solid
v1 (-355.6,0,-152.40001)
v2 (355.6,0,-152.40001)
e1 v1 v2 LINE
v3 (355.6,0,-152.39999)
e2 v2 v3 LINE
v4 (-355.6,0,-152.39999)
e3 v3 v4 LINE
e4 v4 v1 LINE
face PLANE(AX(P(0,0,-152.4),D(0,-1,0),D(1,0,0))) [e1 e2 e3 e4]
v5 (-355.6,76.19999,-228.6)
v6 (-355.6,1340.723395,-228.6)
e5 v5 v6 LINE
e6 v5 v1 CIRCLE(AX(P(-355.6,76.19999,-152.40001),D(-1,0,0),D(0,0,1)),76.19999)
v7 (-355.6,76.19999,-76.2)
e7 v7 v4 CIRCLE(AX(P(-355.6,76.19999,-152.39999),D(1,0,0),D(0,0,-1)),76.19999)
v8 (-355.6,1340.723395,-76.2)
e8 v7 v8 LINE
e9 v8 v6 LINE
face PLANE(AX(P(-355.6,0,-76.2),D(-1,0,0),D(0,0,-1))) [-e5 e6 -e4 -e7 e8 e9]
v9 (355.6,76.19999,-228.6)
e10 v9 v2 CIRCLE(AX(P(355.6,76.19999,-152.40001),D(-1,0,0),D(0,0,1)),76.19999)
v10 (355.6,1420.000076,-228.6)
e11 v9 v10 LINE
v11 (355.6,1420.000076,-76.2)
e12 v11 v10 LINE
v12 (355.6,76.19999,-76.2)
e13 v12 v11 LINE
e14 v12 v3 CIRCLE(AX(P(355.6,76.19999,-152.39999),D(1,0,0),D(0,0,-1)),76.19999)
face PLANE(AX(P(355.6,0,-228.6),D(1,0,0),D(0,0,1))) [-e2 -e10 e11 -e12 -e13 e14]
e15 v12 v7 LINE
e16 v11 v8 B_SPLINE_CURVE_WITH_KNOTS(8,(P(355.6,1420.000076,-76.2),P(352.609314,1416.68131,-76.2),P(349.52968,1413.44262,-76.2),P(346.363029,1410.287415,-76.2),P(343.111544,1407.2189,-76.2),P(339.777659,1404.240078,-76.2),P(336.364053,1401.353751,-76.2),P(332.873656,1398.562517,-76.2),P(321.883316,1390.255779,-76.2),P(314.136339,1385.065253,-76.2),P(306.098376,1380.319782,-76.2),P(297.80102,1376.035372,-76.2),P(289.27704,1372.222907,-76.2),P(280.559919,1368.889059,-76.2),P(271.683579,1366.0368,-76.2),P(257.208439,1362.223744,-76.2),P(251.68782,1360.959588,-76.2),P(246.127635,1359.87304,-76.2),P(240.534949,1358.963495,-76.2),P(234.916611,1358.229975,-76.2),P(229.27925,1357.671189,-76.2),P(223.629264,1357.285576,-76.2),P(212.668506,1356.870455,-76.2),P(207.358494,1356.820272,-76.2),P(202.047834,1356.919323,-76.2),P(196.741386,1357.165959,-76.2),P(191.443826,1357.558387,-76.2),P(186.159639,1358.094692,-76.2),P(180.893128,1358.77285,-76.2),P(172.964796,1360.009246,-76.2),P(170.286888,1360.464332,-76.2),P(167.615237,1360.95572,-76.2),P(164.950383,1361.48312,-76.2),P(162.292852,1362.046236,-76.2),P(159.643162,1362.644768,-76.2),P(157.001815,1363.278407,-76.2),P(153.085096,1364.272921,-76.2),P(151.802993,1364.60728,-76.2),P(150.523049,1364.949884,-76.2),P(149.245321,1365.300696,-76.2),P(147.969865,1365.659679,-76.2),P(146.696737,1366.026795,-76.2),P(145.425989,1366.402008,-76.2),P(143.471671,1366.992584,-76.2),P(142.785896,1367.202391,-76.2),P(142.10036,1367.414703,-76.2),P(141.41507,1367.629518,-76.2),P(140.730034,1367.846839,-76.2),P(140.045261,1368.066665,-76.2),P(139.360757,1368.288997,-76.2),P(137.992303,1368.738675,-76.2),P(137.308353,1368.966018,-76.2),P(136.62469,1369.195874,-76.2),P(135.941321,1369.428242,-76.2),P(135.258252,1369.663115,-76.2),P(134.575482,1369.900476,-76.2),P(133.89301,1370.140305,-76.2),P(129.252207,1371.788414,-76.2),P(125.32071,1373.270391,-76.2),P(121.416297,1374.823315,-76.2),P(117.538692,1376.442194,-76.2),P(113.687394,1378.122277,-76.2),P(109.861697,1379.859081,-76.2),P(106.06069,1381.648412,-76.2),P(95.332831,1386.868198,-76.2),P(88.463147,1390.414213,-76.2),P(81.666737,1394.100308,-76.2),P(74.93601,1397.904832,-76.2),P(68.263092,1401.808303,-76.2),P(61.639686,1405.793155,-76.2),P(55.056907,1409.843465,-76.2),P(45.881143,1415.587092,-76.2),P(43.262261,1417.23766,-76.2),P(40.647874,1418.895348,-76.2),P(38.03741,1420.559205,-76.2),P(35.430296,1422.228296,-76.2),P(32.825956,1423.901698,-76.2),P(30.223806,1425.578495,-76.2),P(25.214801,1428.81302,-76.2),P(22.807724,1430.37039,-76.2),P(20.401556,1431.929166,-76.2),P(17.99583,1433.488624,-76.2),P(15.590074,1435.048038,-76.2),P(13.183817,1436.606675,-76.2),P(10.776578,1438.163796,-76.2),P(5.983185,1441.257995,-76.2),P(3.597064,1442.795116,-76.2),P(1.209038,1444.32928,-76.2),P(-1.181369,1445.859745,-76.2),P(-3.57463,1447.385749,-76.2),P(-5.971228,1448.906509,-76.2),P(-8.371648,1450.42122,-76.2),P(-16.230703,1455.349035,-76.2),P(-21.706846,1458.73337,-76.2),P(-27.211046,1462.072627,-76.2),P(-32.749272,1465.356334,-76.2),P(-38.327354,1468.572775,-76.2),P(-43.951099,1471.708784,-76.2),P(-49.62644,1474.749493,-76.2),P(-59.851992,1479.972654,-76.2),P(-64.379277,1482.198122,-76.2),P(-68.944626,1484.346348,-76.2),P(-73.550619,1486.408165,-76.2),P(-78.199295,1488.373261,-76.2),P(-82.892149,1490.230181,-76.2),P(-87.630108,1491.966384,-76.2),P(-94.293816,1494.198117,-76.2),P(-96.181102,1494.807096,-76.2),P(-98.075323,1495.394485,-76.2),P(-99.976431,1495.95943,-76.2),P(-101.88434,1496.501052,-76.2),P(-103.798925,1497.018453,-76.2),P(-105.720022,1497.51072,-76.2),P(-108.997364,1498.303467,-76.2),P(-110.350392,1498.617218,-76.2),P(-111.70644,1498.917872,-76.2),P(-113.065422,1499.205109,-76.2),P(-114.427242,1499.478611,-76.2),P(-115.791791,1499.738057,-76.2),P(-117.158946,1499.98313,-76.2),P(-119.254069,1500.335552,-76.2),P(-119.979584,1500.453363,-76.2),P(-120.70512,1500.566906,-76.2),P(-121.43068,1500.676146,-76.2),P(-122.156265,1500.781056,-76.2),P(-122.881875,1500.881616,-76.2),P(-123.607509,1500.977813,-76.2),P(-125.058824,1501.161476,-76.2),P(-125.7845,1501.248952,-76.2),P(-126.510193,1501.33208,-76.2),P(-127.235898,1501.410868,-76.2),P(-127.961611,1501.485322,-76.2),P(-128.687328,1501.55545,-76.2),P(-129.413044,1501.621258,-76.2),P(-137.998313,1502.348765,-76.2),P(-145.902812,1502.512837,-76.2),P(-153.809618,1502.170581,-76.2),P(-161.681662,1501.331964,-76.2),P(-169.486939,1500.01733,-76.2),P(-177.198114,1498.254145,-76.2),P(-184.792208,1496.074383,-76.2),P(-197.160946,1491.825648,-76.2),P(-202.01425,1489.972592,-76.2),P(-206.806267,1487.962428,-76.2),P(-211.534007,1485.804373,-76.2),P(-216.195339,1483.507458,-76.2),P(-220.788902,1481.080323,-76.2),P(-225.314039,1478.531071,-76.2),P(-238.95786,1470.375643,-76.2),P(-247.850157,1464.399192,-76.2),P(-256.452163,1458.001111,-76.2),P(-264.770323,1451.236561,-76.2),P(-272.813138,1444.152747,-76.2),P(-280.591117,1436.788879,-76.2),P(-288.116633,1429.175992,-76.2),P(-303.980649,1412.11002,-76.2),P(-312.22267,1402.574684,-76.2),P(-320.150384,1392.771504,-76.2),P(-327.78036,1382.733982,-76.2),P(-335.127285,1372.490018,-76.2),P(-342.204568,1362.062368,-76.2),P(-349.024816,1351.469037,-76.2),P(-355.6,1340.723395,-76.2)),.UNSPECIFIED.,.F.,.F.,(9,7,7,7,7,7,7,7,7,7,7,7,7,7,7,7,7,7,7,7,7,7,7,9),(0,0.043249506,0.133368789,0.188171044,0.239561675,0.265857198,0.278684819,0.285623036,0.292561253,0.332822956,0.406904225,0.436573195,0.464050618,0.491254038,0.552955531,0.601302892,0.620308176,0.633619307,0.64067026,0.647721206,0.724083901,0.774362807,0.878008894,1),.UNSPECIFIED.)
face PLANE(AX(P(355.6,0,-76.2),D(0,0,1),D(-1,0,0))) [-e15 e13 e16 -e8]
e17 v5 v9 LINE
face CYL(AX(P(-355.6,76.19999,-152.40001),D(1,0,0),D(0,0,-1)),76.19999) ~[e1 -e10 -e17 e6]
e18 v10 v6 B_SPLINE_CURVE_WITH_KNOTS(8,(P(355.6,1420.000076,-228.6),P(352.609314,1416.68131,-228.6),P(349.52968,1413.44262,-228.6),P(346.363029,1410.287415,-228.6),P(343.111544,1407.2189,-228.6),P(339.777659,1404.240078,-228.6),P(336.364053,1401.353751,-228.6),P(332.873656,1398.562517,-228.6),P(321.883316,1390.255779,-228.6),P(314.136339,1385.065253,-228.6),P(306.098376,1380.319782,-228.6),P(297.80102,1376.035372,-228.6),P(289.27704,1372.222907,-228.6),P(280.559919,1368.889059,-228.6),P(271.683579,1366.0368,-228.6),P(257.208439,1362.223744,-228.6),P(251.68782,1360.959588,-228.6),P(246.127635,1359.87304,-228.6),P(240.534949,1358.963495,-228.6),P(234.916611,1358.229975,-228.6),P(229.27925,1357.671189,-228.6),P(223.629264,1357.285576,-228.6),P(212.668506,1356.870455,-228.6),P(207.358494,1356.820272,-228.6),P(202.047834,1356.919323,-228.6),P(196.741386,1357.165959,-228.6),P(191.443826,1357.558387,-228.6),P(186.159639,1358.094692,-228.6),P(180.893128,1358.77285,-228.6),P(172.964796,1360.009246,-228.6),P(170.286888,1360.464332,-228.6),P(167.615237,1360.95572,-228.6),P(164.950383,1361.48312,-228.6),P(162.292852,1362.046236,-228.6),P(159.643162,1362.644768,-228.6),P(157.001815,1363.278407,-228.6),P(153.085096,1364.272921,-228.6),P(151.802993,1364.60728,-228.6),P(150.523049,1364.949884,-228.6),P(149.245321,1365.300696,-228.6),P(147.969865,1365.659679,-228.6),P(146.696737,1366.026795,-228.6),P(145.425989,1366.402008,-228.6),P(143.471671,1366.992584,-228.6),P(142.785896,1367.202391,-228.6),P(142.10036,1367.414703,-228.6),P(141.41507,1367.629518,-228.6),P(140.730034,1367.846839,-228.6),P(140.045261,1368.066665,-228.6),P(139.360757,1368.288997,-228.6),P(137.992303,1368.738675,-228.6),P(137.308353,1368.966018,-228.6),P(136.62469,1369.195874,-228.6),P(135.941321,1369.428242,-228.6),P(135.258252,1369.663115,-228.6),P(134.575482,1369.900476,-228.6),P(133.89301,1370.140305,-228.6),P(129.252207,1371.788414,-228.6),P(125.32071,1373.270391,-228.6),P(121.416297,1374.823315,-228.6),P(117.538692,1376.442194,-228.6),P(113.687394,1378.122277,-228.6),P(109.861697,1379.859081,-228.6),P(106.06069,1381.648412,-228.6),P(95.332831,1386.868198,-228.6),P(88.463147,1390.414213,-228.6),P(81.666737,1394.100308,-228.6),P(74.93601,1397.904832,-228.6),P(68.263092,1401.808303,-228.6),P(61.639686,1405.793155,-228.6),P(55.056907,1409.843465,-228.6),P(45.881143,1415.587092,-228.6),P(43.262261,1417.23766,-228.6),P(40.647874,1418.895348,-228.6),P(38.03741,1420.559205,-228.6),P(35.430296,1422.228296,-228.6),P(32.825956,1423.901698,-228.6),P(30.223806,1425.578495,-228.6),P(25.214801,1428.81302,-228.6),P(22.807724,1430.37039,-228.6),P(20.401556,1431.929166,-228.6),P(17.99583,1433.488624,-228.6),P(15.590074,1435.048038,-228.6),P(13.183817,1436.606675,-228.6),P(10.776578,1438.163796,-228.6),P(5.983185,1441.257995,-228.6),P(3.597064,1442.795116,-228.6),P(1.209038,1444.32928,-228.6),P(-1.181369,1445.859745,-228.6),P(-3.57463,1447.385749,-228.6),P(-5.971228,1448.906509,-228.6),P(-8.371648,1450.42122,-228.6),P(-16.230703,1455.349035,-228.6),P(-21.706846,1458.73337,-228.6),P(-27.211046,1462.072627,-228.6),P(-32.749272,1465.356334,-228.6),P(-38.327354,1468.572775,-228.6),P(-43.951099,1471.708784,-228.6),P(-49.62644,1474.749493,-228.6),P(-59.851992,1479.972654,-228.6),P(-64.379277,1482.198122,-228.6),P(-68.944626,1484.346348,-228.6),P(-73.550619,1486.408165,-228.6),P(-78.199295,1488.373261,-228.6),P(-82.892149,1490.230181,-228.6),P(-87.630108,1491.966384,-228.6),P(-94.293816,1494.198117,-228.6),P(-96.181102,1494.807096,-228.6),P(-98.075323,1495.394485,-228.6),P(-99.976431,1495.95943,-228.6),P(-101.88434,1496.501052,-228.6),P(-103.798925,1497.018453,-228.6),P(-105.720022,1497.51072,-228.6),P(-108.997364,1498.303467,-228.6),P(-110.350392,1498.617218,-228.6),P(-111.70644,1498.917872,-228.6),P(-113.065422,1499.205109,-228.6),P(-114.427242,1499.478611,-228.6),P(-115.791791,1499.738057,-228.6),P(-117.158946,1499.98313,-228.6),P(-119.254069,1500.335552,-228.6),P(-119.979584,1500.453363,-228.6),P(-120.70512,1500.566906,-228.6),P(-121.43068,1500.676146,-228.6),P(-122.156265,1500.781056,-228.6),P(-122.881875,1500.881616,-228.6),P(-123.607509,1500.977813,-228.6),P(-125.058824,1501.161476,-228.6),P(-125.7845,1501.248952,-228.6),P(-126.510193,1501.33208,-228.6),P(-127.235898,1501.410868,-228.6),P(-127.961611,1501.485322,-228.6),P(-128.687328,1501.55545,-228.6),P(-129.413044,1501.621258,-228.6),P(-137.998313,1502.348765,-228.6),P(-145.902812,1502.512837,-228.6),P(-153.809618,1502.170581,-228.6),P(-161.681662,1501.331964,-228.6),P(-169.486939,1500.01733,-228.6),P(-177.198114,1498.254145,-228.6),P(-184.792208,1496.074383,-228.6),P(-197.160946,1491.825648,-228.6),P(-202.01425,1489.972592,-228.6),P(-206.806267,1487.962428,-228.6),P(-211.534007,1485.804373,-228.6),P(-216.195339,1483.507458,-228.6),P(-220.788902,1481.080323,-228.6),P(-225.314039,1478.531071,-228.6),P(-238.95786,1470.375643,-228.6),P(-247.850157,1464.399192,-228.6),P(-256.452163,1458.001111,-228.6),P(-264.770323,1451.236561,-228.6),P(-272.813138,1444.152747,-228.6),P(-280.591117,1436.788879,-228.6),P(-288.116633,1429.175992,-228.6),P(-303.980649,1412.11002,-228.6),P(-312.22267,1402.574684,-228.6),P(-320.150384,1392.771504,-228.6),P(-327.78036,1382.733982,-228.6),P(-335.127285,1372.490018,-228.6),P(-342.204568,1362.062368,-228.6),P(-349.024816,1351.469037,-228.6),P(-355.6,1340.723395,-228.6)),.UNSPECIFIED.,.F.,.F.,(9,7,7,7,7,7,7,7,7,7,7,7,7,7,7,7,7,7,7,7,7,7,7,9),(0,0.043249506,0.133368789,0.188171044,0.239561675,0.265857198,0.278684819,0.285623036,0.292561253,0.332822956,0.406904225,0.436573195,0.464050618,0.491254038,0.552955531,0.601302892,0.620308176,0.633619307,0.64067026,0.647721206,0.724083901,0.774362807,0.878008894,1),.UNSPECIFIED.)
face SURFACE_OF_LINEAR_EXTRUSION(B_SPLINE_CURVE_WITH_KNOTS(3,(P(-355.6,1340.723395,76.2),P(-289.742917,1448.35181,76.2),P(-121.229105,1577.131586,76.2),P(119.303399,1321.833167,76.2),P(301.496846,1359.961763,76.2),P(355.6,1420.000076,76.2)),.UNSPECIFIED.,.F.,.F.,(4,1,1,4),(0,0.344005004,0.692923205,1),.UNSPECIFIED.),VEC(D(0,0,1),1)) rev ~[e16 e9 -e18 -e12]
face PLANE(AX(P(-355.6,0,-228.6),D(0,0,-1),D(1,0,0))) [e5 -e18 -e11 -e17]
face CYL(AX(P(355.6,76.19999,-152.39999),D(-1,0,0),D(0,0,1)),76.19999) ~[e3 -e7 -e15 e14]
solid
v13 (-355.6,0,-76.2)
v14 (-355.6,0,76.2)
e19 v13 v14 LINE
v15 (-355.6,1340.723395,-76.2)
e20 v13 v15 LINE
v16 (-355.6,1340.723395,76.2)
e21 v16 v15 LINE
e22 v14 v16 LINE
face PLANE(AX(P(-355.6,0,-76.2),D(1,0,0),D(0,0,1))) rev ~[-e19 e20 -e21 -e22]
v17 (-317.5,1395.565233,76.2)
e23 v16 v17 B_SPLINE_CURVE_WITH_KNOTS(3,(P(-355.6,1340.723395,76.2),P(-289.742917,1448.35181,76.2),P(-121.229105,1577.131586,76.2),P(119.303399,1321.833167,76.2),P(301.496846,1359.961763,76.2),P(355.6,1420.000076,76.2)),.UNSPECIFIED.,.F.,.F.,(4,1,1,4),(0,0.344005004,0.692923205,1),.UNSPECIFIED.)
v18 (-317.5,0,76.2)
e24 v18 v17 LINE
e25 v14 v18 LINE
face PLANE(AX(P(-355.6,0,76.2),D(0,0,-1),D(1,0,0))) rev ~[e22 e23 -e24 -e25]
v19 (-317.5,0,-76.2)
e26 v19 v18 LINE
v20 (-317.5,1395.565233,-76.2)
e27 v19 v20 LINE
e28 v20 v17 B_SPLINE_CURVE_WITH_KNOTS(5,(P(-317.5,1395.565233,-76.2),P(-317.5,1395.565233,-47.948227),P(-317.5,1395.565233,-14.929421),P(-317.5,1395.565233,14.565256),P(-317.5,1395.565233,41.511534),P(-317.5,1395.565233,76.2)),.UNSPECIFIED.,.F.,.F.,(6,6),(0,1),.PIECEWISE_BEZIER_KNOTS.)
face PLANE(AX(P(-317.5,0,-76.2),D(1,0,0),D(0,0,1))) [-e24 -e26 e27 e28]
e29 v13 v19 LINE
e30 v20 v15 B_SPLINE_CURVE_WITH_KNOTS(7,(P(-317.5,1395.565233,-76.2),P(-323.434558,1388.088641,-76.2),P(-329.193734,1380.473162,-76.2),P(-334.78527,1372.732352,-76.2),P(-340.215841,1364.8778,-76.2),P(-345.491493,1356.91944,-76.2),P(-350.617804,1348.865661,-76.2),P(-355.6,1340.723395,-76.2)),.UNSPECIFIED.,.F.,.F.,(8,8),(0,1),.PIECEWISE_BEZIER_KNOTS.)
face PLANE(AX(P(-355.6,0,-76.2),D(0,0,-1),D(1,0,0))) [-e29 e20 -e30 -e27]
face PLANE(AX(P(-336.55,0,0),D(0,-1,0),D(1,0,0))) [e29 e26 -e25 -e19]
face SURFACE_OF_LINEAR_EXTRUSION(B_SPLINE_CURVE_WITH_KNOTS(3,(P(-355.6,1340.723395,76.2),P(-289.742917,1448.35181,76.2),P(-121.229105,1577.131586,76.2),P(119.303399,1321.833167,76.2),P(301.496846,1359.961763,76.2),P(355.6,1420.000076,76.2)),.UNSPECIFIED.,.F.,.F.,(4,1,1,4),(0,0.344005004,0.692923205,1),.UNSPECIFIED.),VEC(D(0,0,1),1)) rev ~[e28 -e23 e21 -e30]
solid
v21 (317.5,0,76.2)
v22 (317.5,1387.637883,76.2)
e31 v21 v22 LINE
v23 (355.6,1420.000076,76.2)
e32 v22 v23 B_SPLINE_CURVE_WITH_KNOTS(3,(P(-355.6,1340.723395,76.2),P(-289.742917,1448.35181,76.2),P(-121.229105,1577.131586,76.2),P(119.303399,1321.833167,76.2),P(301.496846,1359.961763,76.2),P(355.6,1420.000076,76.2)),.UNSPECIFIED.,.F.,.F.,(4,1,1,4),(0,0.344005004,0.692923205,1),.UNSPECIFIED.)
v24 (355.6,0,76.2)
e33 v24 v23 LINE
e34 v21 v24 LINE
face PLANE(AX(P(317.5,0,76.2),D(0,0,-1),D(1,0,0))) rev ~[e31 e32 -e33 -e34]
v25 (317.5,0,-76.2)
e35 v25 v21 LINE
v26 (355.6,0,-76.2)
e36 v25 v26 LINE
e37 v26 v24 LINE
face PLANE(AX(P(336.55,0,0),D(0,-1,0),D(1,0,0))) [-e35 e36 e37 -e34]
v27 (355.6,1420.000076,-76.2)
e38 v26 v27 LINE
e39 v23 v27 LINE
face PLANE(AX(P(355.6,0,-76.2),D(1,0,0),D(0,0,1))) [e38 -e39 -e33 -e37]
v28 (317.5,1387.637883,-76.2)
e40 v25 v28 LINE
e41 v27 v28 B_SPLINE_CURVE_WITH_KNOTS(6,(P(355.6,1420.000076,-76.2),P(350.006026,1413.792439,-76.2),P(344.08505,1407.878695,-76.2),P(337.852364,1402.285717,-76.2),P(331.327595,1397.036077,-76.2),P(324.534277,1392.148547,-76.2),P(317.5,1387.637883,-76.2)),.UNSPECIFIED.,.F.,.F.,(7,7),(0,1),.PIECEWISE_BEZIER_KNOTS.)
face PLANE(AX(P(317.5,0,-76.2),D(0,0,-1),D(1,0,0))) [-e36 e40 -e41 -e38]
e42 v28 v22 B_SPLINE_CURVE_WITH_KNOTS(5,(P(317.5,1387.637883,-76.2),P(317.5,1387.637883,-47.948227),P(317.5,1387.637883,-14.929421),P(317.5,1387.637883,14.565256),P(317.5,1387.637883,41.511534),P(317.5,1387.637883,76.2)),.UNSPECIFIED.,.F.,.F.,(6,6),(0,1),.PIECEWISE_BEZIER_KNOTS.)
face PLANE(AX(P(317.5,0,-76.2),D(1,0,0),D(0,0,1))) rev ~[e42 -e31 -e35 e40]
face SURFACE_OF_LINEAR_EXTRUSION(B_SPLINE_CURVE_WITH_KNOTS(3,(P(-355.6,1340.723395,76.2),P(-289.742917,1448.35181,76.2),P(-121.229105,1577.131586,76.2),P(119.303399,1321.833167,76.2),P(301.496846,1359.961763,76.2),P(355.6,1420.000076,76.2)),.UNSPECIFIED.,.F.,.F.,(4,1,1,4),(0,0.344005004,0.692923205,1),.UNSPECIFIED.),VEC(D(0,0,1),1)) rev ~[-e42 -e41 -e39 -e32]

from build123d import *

# Parameters (mm, degrees)
F1_DEPTH = 3657.6
F0_W     = 38.1
F0_H     = 152.4
F2_DEPTH = 3657.6
F3_R     = 76.19999
F5_DEPTH = 457.2


# Not quite as in the source:
# - a fillet or chamfer is up to 0.001 mm smaller than in the source, because OpenCascade refuses the exact size


with BuildPart() as f1:
    # F0 (on Front) → F1 (new body)
    with BuildSketch(Plane.XZ):
        Polygon((355.6, -228.6), (355.6, -76.2), (317.5, -76.2), (-317.5, -76.2), (-355.6, -76.2), (-355.6, -228.6), align=None)
    extrude(amount=-F1_DEPTH)

    # F3 (radius 76.2 in the source; OpenCascade refuses exactly that, so slightly less here)
    f3_edges = [f1.edges().sort_by_distance(p)[0] for p in [
        (0, 0, -76.2),
        (0, 0, -228.6),
        (0, 3657.6, -76.2),
        (0, 3657.6, -228.6),
    ]]
    fillet(f3_edges, radius=F3_R)


with BuildPart() as f2:
    # F0 (on Front) → F2 (new body)
    with BuildSketch(Plane.XZ):
        with Locations((-336.55, 0)):
            Rectangle(F0_W, F0_H)
    extrude(amount=-F2_DEPTH)


with BuildPart() as f2b:
    # F0 (on Front) → F2, piece 2 (new body)
    with BuildSketch(Plane.XZ):
        with Locations((336.55, 0)):
            Rectangle(F0_W, F0_H)
    extrude(amount=-F2_DEPTH)


with BuildPart() as f5_tool:
    # F4 (on face) → F5 (new body)
    with BuildSketch(Plane.XY.offset(76.2)):
        with BuildLine():
            add(Edge.make_bspline(
                [(-355.6, 1340.7233953476), (-915.2366441797, 2359.9510577055), (-1874.2710818809, 3810.9319191607), (44.2691580348, 3688.5723981757), (1019.2784863169, 3988.9601565781), (622.7710571708, 2551.7090574544), (355.6, 1420.0000762939)],
                knots=[0, 0, 0, 0, 0.3063254336, 0.5332153522, 0.6939292156, 1, 1, 1, 1], degree=3))
            Line((-355.6, 1340.7233953476), (-355.6, 3657.6))
            Line((-355.6, 3657.6), (-317.5, 3657.6))
            Line((-317.5, 3657.6), (-317.5, 1395.5652334485))
            add(Edge.make_bspline(
                [(-317.5, 1395.5652334485), (-258.9308915713, 1469.3529332863), (-105.9839814864, 1560.950588612), (119.3033990895, 1321.8331668454), (301.4968463301, 1359.961763396), (355.6, 1420.0000762939)],
                knots=[0.0633807199, 0.0633807199, 0.0633807199, 0.0633807199, 0.3440050043, 0.6929232049, 1, 1, 1, 1], degree=3))
        make_face()
        with BuildLine():
            Line((-355.6, 3657.6), (-355.6, 1340.7233953476))
            add(Edge.make_bspline(
                [(-355.6, 1340.7233953476), (-343.4662540536, 1360.5532417767), (-330.7281932248, 1378.8998277892), (-317.5, 1395.5652334485)],
                knots=[0, 0, 0, 0, 0.0633807199, 0.0633807199, 0.0633807199, 0.0633807199], degree=3))
            Line((-317.5, 1395.5652334485), (-317.5, 3657.6))
            Line((-317.5, 3657.6), (-355.6, 3657.6))
        make_face()
    extrude(amount=-F5_DEPTH)


with BuildPart() as f1_1:
    add(f1.part)

    # F5: cut by f5_tool
    add(f5_tool.part, mode=Mode.SUBTRACT)


with BuildPart() as f2_1:
    add(f2.part)

    # F5: cut by f5_tool
    add(f5_tool.part, mode=Mode.SUBTRACT)


with BuildPart() as f2b_1:
    add(f2b.part)

    # F5: cut by f5_tool
    add(f5_tool.part, mode=Mode.SUBTRACT)


solid = Compound([f1_1.part, f2_1.part, f2b_1.part])
